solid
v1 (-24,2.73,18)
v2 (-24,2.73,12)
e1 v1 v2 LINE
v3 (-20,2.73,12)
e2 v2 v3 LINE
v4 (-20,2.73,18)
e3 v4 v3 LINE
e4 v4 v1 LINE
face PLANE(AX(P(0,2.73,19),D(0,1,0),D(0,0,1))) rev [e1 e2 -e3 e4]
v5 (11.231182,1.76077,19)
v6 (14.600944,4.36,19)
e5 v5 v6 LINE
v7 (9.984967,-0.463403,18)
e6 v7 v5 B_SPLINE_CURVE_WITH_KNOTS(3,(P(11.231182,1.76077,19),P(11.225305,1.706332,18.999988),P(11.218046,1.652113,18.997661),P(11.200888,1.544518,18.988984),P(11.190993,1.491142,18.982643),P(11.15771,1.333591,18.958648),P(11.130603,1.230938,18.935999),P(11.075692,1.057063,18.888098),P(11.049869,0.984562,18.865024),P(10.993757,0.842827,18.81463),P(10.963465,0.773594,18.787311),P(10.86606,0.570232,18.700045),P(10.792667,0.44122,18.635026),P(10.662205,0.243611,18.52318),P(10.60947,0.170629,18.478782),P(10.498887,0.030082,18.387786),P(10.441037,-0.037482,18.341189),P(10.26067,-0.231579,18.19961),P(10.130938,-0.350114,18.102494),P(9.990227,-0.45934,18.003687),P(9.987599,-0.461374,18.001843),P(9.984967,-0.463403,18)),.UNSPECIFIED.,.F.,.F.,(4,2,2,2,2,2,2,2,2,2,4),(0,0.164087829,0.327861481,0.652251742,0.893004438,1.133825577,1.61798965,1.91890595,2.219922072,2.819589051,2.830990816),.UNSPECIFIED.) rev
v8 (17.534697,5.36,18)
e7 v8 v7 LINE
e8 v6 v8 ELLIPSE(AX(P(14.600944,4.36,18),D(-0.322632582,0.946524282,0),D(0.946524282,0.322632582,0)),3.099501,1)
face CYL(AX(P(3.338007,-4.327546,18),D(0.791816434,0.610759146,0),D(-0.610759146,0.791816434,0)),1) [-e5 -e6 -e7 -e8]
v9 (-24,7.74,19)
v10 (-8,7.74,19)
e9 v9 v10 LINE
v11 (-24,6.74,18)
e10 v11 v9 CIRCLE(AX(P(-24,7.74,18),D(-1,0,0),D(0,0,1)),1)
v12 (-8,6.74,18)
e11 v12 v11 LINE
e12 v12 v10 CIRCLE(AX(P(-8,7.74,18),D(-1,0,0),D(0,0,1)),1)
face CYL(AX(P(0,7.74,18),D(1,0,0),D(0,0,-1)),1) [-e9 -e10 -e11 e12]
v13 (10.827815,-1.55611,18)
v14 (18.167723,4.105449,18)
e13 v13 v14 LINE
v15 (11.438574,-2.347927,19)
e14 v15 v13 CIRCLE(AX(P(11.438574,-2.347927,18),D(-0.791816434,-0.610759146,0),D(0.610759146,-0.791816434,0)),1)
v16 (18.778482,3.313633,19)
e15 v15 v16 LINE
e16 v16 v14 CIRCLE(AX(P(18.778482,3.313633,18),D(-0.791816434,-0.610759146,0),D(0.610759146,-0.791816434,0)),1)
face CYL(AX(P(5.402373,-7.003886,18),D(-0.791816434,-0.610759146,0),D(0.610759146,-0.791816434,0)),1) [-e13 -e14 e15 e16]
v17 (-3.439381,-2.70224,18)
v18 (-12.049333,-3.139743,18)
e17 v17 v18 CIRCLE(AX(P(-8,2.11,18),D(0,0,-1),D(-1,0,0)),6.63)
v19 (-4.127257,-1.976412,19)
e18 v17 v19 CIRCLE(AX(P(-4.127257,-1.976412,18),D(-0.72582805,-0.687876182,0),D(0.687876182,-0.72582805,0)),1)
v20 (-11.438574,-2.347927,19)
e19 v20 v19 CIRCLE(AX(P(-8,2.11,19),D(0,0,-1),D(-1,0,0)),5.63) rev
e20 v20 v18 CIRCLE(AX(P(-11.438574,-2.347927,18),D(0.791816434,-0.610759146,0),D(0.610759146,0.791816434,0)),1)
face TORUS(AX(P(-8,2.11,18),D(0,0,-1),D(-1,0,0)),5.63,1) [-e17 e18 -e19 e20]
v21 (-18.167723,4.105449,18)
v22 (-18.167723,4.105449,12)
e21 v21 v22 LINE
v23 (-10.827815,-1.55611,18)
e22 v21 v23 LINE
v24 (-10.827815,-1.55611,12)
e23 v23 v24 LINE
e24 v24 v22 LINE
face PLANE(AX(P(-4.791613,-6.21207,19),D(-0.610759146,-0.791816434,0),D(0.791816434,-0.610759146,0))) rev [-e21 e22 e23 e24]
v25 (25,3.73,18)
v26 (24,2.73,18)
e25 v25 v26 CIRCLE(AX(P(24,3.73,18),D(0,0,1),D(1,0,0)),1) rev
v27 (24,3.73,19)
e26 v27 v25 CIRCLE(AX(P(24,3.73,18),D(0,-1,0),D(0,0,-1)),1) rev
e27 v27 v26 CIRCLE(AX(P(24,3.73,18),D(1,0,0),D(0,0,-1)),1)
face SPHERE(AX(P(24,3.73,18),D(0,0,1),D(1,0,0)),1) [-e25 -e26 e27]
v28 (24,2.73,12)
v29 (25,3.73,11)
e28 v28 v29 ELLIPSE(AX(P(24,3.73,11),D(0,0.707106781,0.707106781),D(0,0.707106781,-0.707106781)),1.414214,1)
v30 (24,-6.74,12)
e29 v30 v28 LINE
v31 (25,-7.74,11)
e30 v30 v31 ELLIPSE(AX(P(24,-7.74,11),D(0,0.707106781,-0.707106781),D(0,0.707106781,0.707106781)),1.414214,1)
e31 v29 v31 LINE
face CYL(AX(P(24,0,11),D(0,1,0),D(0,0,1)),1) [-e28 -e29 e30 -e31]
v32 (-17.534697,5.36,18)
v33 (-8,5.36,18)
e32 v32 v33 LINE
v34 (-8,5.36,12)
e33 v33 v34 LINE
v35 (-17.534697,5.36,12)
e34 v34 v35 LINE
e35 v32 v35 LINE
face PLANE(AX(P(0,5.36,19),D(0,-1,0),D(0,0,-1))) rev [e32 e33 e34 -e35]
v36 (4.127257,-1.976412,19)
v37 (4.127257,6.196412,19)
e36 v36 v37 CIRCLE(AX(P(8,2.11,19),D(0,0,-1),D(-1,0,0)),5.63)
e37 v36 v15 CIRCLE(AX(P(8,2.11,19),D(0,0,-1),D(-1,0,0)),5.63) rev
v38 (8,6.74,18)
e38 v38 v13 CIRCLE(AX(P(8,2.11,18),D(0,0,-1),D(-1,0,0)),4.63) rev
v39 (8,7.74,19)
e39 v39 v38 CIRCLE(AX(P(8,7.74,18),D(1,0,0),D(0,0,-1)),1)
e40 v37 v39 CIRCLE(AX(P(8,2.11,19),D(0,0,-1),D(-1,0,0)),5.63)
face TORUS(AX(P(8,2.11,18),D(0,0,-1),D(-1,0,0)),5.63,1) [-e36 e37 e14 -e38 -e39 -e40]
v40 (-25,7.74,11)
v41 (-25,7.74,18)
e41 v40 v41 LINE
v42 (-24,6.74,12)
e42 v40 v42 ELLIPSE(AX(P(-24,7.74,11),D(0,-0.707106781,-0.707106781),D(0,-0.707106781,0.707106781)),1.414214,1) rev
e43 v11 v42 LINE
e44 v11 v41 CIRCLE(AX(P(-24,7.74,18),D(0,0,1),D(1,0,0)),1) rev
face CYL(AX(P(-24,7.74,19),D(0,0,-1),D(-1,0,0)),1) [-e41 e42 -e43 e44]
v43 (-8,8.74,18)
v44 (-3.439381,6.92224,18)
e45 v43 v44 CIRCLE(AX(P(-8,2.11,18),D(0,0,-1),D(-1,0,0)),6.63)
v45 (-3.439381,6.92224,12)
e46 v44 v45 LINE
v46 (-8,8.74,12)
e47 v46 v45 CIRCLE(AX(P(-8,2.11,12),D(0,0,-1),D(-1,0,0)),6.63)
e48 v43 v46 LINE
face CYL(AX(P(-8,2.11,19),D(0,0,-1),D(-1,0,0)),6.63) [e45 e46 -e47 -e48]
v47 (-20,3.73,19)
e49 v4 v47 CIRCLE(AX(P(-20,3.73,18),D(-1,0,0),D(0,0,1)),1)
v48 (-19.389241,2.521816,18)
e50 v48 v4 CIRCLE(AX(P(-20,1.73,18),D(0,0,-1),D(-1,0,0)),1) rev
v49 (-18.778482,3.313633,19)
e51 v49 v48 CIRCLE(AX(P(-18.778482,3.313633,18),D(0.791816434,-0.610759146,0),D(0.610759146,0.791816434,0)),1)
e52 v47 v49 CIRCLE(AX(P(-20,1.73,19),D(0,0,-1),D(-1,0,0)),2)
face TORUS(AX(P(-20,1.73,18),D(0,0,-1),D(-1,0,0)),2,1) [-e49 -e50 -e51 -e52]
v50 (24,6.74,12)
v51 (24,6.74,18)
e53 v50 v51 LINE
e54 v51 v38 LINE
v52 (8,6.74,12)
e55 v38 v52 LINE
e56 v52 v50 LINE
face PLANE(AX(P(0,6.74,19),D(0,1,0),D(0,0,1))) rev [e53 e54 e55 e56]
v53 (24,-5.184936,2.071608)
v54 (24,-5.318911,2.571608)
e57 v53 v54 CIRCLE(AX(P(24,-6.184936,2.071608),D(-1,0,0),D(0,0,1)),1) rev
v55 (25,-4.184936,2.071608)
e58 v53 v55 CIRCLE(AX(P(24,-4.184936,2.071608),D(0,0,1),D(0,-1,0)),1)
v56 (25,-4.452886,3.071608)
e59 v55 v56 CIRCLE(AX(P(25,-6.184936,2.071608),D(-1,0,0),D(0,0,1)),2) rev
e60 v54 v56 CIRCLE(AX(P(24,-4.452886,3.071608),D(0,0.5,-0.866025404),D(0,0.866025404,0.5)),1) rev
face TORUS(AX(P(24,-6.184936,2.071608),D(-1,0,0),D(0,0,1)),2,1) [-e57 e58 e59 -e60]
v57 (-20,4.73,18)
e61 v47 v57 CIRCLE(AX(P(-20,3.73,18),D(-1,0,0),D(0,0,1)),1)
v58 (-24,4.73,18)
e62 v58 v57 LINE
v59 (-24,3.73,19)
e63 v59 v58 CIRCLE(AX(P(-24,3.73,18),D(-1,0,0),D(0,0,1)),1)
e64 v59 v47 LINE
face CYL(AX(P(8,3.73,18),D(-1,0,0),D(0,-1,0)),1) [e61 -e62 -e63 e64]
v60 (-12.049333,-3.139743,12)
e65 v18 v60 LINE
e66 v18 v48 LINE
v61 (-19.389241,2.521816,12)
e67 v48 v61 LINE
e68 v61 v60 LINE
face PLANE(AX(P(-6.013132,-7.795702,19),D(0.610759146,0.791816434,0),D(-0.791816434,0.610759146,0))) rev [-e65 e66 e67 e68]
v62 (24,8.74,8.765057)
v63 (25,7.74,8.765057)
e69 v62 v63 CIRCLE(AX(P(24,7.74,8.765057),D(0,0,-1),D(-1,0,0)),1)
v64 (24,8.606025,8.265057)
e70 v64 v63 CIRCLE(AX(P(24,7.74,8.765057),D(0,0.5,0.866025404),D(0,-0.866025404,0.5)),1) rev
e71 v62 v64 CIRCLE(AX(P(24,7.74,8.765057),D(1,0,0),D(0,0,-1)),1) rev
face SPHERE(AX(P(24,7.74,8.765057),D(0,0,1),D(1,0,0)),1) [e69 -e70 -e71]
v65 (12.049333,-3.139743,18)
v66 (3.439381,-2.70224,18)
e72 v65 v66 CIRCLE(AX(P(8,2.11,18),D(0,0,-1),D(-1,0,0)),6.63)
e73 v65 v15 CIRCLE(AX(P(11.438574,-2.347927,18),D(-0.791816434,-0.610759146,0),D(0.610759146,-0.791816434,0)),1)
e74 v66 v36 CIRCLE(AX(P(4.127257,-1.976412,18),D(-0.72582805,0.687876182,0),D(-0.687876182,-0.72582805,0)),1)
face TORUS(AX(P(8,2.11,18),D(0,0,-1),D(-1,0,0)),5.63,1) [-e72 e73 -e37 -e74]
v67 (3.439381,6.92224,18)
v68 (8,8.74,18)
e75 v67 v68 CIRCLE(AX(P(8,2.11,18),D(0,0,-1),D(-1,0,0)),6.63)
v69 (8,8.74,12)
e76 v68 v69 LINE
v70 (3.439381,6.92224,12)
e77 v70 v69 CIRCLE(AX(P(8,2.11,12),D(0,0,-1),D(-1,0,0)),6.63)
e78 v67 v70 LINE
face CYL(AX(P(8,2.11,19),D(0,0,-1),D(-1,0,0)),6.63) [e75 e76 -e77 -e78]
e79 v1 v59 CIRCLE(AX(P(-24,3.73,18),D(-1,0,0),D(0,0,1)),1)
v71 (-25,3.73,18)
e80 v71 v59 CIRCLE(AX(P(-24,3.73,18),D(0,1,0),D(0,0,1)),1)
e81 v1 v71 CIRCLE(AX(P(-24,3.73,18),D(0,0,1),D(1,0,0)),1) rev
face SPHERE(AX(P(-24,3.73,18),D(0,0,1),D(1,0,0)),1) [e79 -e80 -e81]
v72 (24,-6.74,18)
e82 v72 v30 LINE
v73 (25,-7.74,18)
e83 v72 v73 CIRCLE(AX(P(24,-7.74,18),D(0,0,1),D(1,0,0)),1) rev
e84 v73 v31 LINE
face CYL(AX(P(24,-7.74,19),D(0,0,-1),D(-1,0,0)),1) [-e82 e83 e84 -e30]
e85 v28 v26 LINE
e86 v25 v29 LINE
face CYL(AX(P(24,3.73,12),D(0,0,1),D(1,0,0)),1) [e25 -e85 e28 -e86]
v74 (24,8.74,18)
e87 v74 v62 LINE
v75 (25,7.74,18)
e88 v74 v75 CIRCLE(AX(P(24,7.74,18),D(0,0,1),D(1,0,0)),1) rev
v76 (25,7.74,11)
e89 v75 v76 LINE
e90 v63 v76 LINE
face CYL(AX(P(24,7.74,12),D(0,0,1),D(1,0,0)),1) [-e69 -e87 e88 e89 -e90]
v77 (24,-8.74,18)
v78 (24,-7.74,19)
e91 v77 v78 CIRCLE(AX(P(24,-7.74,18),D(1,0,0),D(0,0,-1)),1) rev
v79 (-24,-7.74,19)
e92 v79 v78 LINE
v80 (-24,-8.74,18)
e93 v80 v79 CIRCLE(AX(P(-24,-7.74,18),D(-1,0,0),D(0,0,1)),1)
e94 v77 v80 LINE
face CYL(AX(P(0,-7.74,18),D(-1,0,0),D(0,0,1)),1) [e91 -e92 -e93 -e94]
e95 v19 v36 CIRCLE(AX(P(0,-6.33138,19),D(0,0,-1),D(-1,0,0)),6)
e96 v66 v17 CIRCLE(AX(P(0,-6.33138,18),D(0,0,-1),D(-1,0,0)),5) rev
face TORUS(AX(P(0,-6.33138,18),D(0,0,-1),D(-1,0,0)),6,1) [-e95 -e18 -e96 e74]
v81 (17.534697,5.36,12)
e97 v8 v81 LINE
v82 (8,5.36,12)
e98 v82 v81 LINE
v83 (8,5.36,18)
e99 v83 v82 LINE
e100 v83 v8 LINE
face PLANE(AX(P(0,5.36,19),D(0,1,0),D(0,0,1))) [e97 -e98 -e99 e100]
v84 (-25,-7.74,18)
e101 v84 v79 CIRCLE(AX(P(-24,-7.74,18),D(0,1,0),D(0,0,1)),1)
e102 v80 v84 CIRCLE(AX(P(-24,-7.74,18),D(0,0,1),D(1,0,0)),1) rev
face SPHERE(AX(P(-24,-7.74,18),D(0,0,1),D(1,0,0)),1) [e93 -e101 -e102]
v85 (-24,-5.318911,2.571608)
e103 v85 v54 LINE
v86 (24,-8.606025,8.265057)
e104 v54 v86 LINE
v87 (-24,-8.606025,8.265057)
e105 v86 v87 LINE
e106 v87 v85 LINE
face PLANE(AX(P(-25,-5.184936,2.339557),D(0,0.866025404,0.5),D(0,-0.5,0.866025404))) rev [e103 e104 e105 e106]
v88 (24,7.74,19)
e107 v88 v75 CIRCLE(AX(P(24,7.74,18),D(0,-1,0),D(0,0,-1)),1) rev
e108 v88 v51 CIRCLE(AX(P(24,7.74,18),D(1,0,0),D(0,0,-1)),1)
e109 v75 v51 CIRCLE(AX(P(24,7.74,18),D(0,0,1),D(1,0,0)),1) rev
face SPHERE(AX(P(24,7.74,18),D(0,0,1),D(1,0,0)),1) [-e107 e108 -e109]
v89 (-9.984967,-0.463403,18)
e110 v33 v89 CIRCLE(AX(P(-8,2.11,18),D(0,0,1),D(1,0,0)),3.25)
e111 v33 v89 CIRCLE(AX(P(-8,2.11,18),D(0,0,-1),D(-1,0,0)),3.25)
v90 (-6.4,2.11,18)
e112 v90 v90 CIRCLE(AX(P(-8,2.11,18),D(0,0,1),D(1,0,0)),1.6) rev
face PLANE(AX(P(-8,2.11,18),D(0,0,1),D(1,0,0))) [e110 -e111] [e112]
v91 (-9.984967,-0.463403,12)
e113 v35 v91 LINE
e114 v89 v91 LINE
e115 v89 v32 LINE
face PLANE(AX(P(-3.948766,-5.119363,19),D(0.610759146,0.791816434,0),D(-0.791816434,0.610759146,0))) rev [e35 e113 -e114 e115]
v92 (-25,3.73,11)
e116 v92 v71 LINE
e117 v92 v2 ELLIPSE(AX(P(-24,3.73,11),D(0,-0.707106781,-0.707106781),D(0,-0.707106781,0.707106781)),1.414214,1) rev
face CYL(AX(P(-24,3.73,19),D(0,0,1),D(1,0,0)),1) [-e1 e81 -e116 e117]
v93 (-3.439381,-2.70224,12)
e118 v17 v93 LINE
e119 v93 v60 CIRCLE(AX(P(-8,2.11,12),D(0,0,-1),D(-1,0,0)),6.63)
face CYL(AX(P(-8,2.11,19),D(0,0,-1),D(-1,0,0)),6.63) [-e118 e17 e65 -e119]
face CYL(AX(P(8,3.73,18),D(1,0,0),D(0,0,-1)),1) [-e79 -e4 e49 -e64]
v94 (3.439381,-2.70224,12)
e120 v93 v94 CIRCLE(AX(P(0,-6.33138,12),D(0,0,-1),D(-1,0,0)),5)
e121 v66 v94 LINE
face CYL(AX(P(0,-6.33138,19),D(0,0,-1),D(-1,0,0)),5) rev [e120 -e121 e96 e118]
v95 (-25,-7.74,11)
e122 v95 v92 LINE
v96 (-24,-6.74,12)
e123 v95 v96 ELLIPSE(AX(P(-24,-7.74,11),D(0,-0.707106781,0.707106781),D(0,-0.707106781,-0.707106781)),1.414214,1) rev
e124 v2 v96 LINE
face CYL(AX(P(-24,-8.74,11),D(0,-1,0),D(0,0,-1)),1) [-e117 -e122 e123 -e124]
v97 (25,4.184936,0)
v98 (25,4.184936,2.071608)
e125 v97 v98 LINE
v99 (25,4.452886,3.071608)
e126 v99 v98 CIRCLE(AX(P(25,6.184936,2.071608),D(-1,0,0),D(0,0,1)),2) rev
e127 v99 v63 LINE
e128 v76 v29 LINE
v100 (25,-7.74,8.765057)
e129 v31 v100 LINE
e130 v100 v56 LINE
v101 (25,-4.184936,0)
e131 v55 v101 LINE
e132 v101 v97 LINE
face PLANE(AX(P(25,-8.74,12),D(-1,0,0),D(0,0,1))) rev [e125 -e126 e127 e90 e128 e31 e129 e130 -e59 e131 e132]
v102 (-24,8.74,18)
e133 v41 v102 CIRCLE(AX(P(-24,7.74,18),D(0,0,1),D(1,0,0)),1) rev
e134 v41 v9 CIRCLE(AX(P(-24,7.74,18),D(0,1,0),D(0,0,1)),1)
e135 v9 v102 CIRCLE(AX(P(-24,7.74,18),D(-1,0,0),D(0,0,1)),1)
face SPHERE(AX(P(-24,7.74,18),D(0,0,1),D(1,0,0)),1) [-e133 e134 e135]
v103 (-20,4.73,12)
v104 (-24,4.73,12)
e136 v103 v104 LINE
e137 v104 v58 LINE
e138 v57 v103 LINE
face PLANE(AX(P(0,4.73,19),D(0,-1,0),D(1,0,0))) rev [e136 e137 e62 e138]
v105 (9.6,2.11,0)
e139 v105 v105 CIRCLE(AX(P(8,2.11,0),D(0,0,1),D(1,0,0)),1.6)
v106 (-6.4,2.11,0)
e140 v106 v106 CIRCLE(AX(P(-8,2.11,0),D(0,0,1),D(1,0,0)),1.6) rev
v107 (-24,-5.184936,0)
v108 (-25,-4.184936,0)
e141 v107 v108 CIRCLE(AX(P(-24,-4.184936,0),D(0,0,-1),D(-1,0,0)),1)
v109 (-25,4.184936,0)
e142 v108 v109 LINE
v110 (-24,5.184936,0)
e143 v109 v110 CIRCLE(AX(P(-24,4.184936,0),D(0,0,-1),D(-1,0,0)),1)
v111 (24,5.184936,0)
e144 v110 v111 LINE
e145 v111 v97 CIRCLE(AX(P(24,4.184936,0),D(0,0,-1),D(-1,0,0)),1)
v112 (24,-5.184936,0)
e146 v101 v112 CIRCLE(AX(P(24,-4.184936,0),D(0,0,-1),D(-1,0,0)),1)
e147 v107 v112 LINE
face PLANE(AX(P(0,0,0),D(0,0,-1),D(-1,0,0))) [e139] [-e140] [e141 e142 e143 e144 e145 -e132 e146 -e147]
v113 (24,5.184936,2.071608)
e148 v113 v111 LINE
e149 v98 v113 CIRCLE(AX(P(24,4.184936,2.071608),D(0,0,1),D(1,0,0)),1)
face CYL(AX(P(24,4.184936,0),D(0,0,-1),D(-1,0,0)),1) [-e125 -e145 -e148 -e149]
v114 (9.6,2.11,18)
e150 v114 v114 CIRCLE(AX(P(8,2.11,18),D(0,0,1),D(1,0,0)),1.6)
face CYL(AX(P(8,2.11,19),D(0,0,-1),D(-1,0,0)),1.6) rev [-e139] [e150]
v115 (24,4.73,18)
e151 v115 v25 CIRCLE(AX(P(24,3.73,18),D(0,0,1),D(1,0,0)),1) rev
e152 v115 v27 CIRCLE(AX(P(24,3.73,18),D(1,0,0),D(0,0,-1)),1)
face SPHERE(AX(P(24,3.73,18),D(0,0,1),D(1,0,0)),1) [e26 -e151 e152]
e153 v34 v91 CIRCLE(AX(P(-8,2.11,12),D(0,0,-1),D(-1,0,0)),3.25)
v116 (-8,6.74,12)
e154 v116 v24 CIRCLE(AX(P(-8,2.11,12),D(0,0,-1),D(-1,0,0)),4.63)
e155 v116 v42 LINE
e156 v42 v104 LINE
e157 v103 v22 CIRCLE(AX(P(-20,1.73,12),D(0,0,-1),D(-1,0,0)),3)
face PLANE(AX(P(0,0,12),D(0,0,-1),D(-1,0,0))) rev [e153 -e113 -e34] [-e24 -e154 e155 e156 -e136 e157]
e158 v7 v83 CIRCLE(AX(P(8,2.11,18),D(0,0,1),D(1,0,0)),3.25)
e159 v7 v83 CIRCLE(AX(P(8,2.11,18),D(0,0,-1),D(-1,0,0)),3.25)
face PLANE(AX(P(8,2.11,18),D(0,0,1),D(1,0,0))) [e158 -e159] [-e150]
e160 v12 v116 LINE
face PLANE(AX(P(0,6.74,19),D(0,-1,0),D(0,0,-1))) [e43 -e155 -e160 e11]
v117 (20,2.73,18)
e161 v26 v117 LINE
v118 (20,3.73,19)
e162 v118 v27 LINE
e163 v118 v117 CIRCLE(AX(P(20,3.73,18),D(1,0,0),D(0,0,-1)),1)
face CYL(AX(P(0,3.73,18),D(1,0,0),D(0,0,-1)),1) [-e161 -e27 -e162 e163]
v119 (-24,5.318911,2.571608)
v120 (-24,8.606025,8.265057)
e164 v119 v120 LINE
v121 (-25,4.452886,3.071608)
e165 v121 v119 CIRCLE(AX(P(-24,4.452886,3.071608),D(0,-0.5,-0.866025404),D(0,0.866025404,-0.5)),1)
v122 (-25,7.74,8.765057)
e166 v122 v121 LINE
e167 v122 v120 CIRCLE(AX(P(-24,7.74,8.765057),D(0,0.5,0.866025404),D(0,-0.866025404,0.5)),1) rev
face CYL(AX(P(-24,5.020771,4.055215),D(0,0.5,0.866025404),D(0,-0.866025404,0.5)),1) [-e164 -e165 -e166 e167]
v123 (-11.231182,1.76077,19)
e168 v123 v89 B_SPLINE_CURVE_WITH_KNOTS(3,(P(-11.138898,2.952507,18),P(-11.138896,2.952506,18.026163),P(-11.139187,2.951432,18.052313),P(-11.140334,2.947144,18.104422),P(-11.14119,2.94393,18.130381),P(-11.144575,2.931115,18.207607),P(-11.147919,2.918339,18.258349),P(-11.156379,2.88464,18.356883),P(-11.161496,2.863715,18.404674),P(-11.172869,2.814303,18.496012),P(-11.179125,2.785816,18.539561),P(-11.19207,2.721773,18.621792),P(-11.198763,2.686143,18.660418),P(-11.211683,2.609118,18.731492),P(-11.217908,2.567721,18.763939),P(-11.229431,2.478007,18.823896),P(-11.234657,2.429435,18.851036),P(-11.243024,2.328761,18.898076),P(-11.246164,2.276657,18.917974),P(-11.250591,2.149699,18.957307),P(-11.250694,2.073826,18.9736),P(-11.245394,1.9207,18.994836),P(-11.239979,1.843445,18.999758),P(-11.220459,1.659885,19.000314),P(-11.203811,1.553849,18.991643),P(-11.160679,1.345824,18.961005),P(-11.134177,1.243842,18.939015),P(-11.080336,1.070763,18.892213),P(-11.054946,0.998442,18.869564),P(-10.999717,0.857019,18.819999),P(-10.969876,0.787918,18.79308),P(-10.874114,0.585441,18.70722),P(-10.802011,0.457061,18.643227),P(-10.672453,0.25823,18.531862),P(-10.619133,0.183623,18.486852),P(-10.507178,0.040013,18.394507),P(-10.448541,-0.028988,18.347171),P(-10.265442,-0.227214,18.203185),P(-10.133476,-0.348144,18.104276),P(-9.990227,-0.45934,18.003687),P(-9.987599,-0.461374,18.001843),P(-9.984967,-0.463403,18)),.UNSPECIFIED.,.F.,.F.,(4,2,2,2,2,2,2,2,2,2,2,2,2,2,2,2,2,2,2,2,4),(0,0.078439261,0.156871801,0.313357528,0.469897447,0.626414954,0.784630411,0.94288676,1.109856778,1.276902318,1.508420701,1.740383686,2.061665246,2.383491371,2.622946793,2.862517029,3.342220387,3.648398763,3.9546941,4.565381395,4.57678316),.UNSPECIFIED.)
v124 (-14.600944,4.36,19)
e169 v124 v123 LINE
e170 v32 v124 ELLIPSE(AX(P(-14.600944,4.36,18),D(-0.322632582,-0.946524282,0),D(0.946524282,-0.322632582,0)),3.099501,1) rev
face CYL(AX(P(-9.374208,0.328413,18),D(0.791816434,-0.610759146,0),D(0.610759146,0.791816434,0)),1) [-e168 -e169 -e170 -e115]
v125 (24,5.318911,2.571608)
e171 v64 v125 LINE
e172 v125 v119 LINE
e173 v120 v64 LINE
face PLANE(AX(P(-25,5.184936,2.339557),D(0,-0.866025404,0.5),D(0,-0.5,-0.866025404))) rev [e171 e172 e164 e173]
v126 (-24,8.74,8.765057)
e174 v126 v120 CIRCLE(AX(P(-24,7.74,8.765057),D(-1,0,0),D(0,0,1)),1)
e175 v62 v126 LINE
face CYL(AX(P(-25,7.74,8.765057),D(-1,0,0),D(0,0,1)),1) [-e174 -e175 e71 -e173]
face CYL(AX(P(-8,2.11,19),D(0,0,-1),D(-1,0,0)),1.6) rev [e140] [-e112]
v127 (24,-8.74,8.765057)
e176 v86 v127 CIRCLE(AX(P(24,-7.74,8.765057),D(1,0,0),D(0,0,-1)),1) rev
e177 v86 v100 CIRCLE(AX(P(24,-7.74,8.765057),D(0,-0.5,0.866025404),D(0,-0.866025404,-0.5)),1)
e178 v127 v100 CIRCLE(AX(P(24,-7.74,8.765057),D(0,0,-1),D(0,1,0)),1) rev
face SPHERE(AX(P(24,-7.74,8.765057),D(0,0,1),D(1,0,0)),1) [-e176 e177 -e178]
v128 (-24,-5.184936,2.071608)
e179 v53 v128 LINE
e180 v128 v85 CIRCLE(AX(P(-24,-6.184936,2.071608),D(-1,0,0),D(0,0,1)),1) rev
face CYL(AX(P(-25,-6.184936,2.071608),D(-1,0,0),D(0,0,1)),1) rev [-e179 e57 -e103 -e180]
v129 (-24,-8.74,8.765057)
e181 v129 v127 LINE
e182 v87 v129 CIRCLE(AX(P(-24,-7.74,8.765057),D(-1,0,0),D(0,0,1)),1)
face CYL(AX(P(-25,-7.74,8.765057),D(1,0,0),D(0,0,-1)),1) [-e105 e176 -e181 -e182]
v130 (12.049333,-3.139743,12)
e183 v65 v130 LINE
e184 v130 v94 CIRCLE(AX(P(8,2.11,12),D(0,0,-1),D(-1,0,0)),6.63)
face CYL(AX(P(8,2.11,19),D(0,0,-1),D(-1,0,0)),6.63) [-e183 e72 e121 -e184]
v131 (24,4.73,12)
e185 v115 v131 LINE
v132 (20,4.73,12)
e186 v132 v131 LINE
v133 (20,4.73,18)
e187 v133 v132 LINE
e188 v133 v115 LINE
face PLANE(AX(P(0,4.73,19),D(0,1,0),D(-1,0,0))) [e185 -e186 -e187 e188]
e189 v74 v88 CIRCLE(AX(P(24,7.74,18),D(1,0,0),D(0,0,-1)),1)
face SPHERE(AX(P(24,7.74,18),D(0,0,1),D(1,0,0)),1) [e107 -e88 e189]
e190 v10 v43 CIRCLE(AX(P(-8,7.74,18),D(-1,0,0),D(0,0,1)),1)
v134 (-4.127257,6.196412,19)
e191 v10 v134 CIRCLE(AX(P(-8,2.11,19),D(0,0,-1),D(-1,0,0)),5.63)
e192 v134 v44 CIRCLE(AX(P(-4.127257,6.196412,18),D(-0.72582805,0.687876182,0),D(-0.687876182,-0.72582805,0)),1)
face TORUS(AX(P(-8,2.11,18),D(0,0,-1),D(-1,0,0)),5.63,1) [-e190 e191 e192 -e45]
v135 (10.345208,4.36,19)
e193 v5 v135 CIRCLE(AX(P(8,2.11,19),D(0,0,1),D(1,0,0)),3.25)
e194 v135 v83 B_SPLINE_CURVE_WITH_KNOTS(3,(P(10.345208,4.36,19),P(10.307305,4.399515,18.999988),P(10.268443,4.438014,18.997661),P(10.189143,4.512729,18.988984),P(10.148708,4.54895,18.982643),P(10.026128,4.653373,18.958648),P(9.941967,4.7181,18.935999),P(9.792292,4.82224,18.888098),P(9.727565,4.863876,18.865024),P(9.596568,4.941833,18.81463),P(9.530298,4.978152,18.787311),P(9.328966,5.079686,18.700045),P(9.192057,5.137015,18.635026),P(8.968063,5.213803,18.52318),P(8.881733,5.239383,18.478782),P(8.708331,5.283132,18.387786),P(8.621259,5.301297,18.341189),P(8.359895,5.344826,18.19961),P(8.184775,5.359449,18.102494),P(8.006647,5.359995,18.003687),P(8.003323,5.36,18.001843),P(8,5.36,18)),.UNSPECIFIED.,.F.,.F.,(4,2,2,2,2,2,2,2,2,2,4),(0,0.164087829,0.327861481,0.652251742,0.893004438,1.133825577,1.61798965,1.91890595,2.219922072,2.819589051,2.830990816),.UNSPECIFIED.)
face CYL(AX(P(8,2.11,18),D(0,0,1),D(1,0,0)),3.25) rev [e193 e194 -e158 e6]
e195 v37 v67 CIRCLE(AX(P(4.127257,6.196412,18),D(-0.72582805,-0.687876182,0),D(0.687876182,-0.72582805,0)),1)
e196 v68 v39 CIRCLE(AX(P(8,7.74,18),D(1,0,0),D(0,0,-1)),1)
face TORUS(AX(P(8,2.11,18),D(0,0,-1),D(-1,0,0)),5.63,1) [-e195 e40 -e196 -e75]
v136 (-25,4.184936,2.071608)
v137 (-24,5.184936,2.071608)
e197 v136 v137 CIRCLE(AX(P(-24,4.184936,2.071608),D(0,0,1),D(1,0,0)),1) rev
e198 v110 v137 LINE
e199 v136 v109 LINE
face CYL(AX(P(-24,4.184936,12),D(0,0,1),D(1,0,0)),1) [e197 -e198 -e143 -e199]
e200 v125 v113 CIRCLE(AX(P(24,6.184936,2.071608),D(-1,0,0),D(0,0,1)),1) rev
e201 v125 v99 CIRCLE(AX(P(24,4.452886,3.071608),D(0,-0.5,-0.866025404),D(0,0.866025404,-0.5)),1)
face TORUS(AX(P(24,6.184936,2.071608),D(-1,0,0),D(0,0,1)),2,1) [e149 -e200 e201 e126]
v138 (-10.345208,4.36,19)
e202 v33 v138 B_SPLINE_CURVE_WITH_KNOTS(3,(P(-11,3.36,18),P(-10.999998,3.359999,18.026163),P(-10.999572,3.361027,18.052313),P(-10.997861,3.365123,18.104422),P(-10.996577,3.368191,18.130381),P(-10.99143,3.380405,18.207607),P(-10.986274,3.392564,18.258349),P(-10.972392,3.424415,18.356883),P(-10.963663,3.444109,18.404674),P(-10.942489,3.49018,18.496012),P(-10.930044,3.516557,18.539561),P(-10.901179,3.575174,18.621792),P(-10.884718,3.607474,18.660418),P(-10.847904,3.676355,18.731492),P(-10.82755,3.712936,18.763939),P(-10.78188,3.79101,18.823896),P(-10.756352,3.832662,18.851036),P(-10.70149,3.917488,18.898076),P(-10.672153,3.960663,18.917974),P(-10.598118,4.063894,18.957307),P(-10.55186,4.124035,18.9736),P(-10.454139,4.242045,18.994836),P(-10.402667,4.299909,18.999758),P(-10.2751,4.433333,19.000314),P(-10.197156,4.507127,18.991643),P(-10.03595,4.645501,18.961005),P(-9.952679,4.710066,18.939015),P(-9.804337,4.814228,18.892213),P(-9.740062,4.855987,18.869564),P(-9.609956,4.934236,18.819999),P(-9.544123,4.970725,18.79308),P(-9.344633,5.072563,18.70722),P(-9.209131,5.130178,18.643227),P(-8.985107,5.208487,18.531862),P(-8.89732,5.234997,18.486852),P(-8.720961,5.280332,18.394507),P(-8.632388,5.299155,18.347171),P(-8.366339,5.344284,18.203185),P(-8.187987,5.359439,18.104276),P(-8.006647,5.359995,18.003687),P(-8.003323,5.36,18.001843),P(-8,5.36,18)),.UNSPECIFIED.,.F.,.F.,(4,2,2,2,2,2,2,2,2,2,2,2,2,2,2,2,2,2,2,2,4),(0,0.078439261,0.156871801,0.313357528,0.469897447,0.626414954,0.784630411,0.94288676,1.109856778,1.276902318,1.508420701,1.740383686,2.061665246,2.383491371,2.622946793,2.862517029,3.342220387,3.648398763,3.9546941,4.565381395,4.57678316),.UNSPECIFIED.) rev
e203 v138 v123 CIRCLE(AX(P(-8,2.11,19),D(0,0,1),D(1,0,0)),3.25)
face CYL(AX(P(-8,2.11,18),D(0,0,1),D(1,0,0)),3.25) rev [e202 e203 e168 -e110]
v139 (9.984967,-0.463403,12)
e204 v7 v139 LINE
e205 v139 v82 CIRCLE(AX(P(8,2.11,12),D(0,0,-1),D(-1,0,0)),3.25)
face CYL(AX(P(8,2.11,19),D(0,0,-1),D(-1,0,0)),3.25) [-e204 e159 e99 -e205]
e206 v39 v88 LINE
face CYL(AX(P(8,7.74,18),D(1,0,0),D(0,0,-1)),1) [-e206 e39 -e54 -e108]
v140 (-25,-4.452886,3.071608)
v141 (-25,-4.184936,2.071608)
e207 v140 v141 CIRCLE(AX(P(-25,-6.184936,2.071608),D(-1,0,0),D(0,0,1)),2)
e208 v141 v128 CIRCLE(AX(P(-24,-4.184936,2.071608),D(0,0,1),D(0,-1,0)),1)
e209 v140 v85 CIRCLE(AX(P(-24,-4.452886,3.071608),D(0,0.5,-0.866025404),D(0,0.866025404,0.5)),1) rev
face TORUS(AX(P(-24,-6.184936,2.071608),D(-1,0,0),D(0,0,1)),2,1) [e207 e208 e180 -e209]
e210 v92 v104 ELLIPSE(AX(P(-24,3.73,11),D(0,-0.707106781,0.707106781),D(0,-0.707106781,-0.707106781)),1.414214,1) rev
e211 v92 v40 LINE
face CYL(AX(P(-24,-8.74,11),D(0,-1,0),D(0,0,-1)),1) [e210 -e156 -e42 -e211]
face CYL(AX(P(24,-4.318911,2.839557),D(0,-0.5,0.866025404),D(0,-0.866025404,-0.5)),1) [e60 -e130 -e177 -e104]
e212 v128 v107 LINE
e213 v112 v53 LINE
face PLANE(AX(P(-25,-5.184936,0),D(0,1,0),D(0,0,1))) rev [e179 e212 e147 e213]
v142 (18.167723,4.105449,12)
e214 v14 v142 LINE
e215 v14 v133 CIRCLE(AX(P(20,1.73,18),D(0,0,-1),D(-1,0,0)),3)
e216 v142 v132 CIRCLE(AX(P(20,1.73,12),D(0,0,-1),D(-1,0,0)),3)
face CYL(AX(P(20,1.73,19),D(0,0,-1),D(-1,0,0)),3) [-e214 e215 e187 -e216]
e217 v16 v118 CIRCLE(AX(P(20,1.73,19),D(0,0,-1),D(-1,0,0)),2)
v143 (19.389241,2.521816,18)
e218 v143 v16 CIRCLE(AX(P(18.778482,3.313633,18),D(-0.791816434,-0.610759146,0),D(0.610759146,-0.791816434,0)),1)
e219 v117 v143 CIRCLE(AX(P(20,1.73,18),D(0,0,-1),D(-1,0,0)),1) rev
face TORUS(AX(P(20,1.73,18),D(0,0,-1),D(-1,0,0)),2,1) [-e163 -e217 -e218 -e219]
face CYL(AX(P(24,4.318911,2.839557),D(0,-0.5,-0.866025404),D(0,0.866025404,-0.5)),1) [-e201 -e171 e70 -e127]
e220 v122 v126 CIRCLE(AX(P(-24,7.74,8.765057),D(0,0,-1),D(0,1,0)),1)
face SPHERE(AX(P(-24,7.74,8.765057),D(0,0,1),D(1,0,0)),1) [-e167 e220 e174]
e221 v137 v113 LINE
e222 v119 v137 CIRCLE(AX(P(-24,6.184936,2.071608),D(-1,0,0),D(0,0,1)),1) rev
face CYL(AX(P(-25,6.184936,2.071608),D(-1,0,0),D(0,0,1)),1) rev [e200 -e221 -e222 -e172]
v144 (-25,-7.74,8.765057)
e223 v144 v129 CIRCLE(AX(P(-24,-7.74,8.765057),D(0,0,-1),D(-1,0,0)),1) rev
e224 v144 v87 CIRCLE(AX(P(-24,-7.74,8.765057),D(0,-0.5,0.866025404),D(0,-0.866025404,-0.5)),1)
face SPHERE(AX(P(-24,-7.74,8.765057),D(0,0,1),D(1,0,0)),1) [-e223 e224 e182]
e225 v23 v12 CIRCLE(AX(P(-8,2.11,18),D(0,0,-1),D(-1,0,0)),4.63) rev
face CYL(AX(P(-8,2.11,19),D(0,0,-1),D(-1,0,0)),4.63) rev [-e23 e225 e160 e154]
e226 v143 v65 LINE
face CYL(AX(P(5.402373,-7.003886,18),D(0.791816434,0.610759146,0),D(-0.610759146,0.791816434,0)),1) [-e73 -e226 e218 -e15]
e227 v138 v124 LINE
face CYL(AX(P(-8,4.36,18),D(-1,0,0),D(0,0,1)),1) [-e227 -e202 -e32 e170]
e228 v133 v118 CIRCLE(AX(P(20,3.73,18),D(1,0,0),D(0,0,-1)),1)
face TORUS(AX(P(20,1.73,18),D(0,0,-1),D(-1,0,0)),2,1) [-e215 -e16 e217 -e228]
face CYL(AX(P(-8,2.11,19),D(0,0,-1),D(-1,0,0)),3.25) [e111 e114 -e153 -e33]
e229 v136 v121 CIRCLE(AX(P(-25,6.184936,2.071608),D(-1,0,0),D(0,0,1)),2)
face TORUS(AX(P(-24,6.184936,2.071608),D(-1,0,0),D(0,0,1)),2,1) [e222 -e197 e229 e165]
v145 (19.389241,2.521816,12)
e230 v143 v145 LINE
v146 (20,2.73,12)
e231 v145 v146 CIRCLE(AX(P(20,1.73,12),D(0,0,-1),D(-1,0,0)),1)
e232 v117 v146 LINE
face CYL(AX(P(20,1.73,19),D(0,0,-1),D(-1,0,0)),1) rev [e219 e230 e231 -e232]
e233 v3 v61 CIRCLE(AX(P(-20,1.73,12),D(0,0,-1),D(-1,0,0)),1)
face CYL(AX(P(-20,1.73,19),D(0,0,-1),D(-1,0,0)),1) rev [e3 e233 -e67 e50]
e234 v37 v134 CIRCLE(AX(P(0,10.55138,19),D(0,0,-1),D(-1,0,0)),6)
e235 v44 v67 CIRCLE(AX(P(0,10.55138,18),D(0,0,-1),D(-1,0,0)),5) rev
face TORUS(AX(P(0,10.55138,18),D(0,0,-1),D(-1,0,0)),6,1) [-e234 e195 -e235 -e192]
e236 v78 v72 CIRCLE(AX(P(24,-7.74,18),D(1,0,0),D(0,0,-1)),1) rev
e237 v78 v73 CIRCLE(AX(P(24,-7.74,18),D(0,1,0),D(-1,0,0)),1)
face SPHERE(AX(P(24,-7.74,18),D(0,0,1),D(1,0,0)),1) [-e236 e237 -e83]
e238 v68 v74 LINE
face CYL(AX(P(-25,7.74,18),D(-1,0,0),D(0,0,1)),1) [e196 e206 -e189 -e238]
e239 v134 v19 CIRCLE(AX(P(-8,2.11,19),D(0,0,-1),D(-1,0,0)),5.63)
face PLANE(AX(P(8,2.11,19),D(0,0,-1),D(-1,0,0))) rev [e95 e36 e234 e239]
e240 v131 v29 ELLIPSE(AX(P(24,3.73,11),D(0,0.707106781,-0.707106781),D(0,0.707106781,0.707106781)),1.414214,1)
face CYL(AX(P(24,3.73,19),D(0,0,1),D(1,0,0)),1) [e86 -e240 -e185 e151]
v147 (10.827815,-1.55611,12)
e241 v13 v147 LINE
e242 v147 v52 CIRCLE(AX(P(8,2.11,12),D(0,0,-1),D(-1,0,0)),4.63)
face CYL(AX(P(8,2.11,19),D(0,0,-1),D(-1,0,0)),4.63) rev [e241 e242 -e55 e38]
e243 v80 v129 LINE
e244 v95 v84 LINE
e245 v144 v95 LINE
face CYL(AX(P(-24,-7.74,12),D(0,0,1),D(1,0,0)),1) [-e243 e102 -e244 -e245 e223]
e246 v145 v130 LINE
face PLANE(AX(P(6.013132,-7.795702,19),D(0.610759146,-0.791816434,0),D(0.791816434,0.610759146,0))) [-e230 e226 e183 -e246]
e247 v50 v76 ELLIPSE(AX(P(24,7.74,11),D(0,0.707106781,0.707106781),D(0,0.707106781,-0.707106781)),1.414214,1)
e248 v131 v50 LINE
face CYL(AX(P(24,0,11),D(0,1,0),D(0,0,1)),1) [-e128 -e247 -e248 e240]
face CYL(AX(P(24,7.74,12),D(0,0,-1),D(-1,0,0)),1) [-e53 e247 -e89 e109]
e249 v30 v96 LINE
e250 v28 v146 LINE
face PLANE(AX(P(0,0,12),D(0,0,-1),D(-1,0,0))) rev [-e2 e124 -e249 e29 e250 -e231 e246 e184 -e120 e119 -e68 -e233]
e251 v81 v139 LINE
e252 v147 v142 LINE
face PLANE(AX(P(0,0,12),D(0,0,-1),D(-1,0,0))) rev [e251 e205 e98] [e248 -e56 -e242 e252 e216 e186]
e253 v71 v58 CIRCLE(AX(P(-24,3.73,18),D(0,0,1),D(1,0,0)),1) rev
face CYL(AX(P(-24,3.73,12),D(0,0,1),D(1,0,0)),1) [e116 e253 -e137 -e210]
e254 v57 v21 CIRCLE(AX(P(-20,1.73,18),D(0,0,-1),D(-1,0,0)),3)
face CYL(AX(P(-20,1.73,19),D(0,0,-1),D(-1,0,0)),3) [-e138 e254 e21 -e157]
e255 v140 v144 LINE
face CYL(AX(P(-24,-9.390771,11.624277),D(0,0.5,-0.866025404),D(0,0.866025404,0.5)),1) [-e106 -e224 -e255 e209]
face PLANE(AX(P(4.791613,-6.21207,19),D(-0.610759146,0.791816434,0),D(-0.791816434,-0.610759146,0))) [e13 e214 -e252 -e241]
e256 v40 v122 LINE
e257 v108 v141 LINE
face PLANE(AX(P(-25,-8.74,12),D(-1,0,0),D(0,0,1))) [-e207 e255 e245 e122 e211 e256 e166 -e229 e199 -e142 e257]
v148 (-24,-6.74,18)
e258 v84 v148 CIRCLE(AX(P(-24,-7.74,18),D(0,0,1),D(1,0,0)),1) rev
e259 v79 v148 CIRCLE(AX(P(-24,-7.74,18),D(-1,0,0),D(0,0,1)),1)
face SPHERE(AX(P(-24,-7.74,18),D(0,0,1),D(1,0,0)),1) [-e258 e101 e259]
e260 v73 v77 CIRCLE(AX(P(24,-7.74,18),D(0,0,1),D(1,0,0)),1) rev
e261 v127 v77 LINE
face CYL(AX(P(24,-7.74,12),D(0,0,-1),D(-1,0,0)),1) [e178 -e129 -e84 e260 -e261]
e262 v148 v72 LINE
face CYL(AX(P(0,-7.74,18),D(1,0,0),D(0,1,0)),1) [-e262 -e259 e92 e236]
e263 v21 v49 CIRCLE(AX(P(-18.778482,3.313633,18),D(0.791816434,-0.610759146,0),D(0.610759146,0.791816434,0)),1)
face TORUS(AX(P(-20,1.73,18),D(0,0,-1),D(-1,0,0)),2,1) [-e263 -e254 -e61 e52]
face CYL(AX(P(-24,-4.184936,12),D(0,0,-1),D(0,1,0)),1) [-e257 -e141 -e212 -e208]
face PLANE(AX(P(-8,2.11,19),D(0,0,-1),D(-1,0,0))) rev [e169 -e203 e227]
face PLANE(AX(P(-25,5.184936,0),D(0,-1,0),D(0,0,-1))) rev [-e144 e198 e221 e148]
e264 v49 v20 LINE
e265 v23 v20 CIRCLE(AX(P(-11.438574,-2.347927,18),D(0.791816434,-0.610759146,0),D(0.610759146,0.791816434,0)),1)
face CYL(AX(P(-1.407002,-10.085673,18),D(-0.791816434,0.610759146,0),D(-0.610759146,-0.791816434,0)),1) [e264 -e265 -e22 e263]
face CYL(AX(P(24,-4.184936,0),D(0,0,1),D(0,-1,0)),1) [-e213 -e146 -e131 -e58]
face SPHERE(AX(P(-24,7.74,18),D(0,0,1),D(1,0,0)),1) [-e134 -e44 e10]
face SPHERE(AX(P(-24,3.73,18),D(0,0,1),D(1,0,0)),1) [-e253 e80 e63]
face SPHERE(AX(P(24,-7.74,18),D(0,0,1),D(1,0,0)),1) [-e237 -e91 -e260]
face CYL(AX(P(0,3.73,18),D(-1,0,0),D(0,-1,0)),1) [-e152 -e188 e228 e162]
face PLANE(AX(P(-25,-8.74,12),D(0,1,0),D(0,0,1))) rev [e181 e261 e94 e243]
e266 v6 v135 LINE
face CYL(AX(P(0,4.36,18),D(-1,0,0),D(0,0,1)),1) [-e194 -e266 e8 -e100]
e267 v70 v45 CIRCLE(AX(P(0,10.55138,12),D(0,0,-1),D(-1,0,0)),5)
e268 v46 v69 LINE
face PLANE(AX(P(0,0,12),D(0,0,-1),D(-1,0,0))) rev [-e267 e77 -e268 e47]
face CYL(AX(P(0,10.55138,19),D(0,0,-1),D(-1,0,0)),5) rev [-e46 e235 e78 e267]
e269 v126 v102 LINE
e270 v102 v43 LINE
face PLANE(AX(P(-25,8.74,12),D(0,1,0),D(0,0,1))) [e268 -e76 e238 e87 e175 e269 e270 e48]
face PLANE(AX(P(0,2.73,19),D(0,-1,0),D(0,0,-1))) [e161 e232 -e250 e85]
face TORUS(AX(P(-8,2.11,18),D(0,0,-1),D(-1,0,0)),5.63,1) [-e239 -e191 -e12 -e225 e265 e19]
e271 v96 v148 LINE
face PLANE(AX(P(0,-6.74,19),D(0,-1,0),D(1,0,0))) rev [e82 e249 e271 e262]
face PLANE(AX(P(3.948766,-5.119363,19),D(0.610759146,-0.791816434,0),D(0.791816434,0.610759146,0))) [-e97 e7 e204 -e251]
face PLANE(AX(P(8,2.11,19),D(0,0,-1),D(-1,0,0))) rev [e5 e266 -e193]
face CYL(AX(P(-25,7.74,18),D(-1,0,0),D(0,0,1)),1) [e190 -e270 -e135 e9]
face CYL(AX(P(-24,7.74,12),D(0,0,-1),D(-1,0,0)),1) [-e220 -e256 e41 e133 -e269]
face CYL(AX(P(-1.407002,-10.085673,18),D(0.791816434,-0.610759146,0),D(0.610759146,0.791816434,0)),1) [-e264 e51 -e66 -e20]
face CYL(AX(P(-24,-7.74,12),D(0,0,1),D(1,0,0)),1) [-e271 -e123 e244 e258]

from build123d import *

# Parameters (mm, degrees)
SKETCH_1_W          = 50
SKETCH_1_H          = 17.48
EXTRUDE_1_DEPTH     = 12
EXTRUDE_START       = 12
SKETCH_1_3_W        = 50
SKETCH_1_3_H        = 2
EXTRUDE_2_DEPTH     = 7
SKETCH_1_4_R        = 1.6
CUT_EXTRUDE_1_DEPTH = 19
CUT_EXTRUDE_3_DEPTH = 25
FILLET_1_R          = 1
CUT_EXTRUDE_START   = -1
SKETCH_2_R          = 3.25
CUT_EXTRUDE_2_DEPTH = 1


with BuildPart() as part:
    # Эскиз1 → Бобышка-Вытянуть1 (new body)
    with BuildSketch(Plane.XY):
        Rectangle(SKETCH_1_W, SKETCH_1_H)
    extrude(amount=EXTRUDE_1_DEPTH)

    # Эскиз1<3> → Бобышка-Вытянуть2 (add)
    with BuildSketch(Plane.XY.offset(EXTRUDE_START)):
        with Locations((0, -7.74)):
            Rectangle(SKETCH_1_3_W, SKETCH_1_3_H)
        with BuildLine():
            Line((20, 2.73), (25, 2.73))
            Line((25, 2.73), (25, 4.73))
            Line((25, 4.73), (20, 4.73))
            ThreePointArc((20, 4.73), (19.032102254, 4.569572847), (18.167722561, 4.105449302))
            Line((18.167722561, 4.105449302), (10.827814847, -1.55611009))
            ThreePointArc((10.827814847, -1.55611009), (3.617592573, 0.616211145), (8, 6.74))
            Line((8, 6.74), (25, 6.74))
            Line((25, 6.74), (25, 8.74))
            Line((25, 8.74), (8, 8.74))
            ThreePointArc((8, 8.74), (5.545234329, 8.268816891), (3.439380911, 6.92223997))
            ThreePointArc((3.439380911, 6.92223997), (0, 5.551380219), (-3.439380911, 6.92223997))
            ThreePointArc((-3.439380911, 6.92223997), (-5.545234329, 8.268816891), (-8, 8.74))
            Line((-8, 8.74), (-25, 8.74))
            Line((-25, 8.74), (-25, 6.74))
            Line((-25, 6.74), (-8, 6.74))
            ThreePointArc((-8, 6.74), (-3.617592573, 0.616211145), (-10.827814847, -1.55611009))
            Line((-10.827814847, -1.55611009), (-18.167722561, 4.105449302))
            ThreePointArc((-18.167722561, 4.105449302), (-19.032102254, 4.569572847), (-20, 4.73))
            Line((-20, 4.73), (-25, 4.73))
            Line((-25, 4.73), (-25, 2.73))
            Line((-25, 2.73), (-20, 2.73))
            ThreePointArc((-20, 2.73), (-19.677367418, 2.676524282), (-19.389240854, 2.521816434))
            Line((-19.389240854, 2.521816434), (-12.04933314, -3.139742958))
            ThreePointArc((-12.04933314, -3.139742958), (-7.663539681, -4.511457125), (-3.439380911, -2.70223997))
            ThreePointArc((-3.439380911, -2.70223997), (0, -1.331380219), (3.439380911, -2.70223997))
            ThreePointArc((3.439380911, -2.70223997), (7.663539681, -4.511457125), (12.04933314, -3.139742958))
            Line((12.04933314, -3.139742958), (19.389240854, 2.521816434))
            ThreePointArc((19.389240854, 2.521816434), (19.677367418, 2.676524282), (20, 2.73))
        make_face()
        with BuildLine():
            Line((17.534697018, 5.36), (9.984967225, -0.463403411))
            ThreePointArc((9.984967225, -0.463403411), (4.923796082, 1.061444109), (8, 5.36))
            Line((8, 5.36), (17.534697018, 5.36))
        make_face()
        with BuildLine():
            Line((-8, 5.36), (-17.534697018, 5.36))
            Line((-17.534697018, 5.36), (-9.984967225, -0.463403411))
            ThreePointArc((-9.984967225, -0.463403411), (-4.923796082, 1.061444109), (-8, 5.36))
        make_face()
    extrude(amount=EXTRUDE_2_DEPTH)

    # Эскиз1<4> → Вырез-Вытянуть1 (cut)
    with BuildSketch(Plane.XY):
        with Locations((8, 2.11)):
            Circle(SKETCH_1_4_R)
        with Locations((-8, 2.11)):
            Circle(SKETCH_1_4_R)
    extrude(amount=CUT_EXTRUDE_1_DEPTH, mode=Mode.SUBTRACT)

    # Эскиз3 → Вырез-Вытянуть3 (cut, symmetric)
    with BuildSketch(Plane(origin=(0, 0, 0), x_dir=(0, 0, -1), z_dir=(1, 0, 0))):
        Polygon((0, 8.74), (0, 5.184936491), (-2.339557284, 5.184936491), (-8.497107907, 8.74), align=None)
        Polygon((0, -8.74), (0, -5.184936491), (-2.339557284, -5.184936491), (-8.497107907, -8.74), align=None)
    extrude(amount=CUT_EXTRUDE_3_DEPTH, both=True, mode=Mode.SUBTRACT)

    # Скругление1
    fillet_1_edges = [part.edges().sort_by_distance(p)[0] for p in [
        (-4.923796082, 1.061444109, 19),
        (-12.767348509, 5.36, 19),
        (-13.759832122, 2.448298295, 19),
        (0, 8.74, 8.497107907),
        (-25, -2.005, 12),
        (-25, 5.184936491, 1.169778642),
        (-25, 6.962468245, 5.418332596),
        (0, 5.184936491, 2.339557284),
        (25, 6.962468245, 5.418332596),
        (25, 5.184936491, 1.169778642),
        (25, -2.005, 12),
        (-25, -6.962468245, 5.418332596),
        (0, -8.74, 8.497107907),
        (-25, -5.184936491, 1.169778642),
        (0, -5.184936491, 2.339557284),
        (-25, -7.74, 19),
        (25, -5.184936491, 1.169778642),
        (25, -6.962468245, 5.418332596),
        (-25, -6.74, 15.5),
        (25, -6.74, 15.5),
        (0, -8.74, 19),
        (25, -7.74, 19),
        (0, -6.74, 19),
        (25, 5.735, 12),
        (-25, 5.735, 12),
        (15.719286997, -0.308963262, 19),
        (22.5, 2.73, 19),
        (25, 2.73, 15.5),
        (22.5, 4.73, 19),
        (25, 4.73, 15.5),
        (19.032102254, 4.569572847, 19),
        (14.497768704, 1.274669606, 19),
        (25, 6.74, 15.5),
        (16.5, 8.74, 19),
        (5.545234329, 8.268816891, 19),
        (-5.545234329, 8.268816891, 19),
        (-16.5, 8.74, 19),
        (-25, 7.74, 19),
        (-16.5, 6.74, 19),
        (-25, 6.74, 15.5),
        (-19.032102254, 4.569572847, 19),
        (-25, 3.73, 19),
        (-25, 4.73, 15.5),
        (-25, 2.73, 15.5),
        (-7.663539681, -4.511457125, 19),
        (7.663539681, -4.511457125, 19),
        (19.677367418, 2.676524282, 19),
        (25, 3.73, 19),
        (3.617592573, 0.616211145, 19),
        (16.5, 6.74, 19),
        (25, 7.74, 19),
        (0, 5.551380219, 19),
        (-3.617592573, 0.616211145, 19),
        (-14.497768704, 1.274669606, 19),
        (-22.5, 4.73, 19),
        (-22.5, 2.73, 19),
        (-19.677367418, 2.676524282, 19),
        (-15.719286997, -0.308963262, 19),
        (0, -1.331380219, 19),
        (-25, -8.74, 13.748553953),
        (25, -8.74, 13.748553953),
        (25, 8.74, 13.748553953),
        (-25, 8.74, 13.748553953),
        (4.923796082, 1.061444109, 19),
        (13.759832122, 2.448298295, 19),
        (12.767348509, 5.36, 19),
    ]]
    fillet(fillet_1_edges, radius=FILLET_1_R - 0.0001)  # a hair under: the kernel refuses the full size

    # Эскиз2 → Вырез-Вытянуть2 (cut)
    with BuildSketch(Plane.XY.offset(19).offset(CUT_EXTRUDE_START)):
        with Locations((-8, 2.11)):
            Circle(SKETCH_2_R)
        with Locations((8, 2.11)):
            Circle(SKETCH_2_R)
    extrude(amount=CUT_EXTRUDE_2_DEPTH, mode=Mode.SUBTRACT)


solid = part.part
